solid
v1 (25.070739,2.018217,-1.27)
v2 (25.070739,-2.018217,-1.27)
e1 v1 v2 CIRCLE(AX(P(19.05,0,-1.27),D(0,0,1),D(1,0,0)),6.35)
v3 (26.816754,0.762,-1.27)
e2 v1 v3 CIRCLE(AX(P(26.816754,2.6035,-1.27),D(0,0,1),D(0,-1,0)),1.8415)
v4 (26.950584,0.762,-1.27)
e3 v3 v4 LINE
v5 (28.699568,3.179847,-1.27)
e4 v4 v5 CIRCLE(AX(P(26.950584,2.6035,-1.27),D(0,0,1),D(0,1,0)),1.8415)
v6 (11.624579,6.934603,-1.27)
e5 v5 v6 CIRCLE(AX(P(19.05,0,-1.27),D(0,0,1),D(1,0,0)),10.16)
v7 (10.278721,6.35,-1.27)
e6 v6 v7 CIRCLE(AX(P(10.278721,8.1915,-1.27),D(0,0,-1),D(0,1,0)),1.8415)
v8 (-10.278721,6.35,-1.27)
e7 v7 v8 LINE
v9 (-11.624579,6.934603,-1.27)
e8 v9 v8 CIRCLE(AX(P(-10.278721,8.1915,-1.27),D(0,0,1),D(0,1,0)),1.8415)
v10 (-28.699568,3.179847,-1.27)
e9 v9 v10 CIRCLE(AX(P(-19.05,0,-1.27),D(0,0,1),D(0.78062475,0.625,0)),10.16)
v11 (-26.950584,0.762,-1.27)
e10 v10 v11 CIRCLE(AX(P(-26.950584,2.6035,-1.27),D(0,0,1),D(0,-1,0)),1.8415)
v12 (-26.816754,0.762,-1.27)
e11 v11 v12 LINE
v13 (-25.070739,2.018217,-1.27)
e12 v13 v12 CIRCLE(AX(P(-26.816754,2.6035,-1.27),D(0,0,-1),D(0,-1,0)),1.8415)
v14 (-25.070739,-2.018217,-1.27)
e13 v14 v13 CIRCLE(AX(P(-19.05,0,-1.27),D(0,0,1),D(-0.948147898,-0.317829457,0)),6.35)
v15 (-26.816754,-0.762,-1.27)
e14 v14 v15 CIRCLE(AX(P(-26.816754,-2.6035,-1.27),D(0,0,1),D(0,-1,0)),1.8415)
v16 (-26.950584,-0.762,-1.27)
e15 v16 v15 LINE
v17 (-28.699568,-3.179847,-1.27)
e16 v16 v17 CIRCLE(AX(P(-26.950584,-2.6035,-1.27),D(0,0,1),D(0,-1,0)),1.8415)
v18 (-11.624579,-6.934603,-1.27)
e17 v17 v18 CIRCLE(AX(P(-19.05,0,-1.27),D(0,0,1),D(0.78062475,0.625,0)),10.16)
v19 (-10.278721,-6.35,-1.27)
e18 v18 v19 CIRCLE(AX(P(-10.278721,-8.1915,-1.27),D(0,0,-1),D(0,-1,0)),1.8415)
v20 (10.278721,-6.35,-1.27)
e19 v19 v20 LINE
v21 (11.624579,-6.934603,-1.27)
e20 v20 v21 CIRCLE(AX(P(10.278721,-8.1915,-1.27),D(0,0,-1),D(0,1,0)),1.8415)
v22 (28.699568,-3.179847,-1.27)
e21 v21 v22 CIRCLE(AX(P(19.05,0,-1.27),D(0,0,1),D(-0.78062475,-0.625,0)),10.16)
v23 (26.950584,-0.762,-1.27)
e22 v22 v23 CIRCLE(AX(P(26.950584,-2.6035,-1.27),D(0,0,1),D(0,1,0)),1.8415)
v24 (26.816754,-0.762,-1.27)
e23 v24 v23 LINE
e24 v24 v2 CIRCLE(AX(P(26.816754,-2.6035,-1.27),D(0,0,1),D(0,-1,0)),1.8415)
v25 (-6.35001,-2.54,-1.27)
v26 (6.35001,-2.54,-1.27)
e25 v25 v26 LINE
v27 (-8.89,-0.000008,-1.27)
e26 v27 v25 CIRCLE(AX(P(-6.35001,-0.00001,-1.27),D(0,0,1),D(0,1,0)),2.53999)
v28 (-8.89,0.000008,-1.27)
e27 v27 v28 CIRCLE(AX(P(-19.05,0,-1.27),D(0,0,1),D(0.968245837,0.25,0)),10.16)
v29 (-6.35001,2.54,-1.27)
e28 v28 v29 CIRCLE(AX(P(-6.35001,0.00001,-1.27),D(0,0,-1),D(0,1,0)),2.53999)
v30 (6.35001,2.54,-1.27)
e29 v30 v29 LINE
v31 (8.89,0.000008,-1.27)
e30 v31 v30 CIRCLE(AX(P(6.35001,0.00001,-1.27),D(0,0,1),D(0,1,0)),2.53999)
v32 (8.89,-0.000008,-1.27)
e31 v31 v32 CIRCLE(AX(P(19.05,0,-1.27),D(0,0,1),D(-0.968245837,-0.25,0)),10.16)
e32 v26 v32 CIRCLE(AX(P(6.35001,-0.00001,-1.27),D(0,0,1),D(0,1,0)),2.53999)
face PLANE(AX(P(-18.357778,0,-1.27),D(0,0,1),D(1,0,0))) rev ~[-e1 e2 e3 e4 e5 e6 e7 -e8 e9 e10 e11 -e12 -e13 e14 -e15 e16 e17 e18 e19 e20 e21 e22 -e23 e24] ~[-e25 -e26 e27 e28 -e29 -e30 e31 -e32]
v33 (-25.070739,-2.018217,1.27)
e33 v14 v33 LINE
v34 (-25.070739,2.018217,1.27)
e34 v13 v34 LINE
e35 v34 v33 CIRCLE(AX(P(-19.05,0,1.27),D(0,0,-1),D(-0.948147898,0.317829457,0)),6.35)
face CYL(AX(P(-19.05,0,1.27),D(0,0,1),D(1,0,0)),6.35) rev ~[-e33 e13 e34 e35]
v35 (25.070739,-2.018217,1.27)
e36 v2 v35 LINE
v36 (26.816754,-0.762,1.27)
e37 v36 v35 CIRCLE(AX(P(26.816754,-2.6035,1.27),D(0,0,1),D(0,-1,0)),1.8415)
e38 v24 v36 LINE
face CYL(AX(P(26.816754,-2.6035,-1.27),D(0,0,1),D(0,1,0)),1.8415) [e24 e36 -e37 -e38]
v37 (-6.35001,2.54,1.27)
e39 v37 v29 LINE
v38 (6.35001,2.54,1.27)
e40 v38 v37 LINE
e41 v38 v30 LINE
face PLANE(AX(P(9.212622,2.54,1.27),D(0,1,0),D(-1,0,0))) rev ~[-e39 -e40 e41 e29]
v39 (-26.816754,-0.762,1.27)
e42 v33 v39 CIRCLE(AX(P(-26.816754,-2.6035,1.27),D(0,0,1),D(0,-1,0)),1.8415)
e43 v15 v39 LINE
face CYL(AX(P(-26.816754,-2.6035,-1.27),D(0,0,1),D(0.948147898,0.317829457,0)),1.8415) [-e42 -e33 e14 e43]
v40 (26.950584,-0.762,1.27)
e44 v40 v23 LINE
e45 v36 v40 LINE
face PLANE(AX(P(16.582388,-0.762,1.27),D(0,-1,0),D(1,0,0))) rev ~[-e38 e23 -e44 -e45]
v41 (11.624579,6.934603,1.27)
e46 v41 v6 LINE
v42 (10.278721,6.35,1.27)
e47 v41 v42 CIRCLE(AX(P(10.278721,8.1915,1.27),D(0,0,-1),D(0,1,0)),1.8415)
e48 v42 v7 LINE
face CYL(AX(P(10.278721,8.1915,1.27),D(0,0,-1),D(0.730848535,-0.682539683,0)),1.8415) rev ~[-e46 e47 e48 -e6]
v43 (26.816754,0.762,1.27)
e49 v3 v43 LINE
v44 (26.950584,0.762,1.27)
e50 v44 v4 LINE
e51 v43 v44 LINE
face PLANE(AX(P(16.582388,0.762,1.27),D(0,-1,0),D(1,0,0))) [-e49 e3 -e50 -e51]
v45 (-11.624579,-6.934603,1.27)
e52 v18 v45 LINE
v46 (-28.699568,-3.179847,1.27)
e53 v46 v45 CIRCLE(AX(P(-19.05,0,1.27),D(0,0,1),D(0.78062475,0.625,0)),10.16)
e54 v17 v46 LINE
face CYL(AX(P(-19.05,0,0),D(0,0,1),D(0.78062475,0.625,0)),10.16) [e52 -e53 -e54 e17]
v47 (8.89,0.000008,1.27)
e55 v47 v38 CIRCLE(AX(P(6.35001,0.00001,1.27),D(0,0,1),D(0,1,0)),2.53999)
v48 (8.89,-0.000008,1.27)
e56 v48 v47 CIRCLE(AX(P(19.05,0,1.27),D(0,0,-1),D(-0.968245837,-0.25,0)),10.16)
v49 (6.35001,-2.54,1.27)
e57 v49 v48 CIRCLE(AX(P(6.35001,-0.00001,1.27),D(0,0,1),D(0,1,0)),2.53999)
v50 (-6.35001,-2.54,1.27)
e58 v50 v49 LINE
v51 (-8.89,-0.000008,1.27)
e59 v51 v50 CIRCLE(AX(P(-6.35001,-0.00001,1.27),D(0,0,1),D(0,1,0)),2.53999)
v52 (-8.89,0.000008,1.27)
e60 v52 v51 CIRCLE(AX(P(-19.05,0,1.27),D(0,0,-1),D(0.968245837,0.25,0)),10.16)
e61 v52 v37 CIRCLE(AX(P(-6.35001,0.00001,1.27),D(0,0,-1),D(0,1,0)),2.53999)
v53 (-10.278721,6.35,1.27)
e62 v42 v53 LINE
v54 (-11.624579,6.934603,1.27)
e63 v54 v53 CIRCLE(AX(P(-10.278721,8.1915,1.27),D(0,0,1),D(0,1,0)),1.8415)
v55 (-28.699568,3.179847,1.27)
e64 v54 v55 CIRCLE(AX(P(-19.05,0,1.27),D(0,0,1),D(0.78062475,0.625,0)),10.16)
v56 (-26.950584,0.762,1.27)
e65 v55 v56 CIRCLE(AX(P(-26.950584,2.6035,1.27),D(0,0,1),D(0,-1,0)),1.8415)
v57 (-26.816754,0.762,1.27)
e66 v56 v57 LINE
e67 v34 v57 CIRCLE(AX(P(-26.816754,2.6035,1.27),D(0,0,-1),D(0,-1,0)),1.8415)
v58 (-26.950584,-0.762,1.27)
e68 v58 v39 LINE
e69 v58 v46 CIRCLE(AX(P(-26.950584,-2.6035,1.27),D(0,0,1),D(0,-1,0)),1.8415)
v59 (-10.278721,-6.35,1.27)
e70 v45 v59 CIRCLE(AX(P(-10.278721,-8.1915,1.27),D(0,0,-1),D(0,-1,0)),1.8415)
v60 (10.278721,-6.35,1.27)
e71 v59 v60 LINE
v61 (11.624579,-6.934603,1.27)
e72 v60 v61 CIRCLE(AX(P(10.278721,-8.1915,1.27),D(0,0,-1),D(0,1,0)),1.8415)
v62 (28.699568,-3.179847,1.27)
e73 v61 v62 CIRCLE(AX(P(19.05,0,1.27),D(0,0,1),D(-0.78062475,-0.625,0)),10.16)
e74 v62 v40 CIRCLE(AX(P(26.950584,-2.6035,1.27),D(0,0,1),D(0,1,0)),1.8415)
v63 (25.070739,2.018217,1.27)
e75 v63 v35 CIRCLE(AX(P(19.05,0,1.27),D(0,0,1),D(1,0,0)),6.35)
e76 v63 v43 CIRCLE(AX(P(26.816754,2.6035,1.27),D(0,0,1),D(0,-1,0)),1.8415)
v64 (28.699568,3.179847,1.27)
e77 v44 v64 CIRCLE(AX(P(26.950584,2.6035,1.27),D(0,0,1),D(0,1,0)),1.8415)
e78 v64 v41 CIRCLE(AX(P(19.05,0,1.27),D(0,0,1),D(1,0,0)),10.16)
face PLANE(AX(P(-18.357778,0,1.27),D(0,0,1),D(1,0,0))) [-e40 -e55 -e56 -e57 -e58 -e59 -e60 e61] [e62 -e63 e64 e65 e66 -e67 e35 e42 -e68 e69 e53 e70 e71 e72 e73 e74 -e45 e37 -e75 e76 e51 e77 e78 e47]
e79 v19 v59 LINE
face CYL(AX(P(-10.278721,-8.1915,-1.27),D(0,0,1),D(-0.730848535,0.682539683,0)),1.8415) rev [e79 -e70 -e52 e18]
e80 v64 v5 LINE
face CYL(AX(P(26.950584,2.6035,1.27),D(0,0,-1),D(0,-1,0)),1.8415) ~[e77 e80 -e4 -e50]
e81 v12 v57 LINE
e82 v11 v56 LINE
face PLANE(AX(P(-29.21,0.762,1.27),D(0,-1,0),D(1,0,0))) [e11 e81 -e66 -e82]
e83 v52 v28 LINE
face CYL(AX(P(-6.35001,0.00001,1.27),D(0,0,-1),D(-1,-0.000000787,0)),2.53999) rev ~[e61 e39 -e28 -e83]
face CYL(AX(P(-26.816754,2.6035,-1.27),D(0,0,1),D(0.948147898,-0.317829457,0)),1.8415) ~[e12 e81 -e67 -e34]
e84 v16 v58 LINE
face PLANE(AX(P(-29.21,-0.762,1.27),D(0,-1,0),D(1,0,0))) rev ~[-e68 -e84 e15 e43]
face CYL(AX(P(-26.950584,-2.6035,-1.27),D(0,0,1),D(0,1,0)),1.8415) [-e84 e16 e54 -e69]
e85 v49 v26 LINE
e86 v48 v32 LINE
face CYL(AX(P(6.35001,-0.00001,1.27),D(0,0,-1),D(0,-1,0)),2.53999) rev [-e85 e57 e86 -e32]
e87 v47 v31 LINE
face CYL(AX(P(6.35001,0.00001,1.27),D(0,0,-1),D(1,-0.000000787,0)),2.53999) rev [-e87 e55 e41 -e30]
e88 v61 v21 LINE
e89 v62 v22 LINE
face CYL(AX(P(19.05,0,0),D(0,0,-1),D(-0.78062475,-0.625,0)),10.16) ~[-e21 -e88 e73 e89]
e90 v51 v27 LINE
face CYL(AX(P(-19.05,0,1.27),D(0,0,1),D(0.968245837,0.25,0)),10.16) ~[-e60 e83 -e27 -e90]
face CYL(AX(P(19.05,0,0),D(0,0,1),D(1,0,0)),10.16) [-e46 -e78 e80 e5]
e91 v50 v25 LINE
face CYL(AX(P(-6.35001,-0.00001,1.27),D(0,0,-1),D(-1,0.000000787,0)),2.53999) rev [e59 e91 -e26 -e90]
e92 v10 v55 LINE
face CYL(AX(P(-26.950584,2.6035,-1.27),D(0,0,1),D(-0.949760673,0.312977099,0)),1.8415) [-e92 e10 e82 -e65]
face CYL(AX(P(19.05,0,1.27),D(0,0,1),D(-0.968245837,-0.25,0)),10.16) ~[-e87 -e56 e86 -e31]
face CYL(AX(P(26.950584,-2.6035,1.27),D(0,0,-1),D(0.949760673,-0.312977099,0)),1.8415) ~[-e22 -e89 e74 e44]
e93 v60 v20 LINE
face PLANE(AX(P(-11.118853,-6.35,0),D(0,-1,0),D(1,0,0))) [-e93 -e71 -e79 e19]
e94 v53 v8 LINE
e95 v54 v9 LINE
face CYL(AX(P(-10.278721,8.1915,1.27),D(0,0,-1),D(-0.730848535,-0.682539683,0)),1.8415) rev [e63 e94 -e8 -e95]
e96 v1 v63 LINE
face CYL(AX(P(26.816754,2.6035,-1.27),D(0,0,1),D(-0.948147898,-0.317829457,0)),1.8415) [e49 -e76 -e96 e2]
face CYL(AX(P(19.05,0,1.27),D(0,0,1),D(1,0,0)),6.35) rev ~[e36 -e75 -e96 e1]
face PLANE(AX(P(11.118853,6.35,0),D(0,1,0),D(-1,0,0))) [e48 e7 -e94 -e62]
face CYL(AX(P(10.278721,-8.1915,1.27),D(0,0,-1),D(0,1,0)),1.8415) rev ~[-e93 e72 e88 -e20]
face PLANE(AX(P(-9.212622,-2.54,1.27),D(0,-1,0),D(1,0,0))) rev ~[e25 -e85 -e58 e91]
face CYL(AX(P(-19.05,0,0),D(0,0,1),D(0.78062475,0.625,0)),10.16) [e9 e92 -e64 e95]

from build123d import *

# Parameters (mm, degrees)
F1_DEPTH = 1.27
F2_R     = 6.35
F3_DEPTH = 25.4
F4_W     = 12.6276115155
F4_H     = 1.524
F5_DEPTH = 25.4
F6_R     = 1.8415
F8_DEPTH = 25.4
F9_R     = 2.53999


# Not quite as in the source:
# - a fillet or chamfer is up to 0.001 mm smaller than in the source, because OpenCascade refuses the exact size


with BuildPart() as f1:
    # F0 (on Top) → F1 (new body, symmetric)
    with BuildSketch(Plane.XY):
        with BuildLine():
            ThreePointArc((-11.118852542, -6.35), (-9.4633932444, -3.3649028089), (-8.89, 0))
            ThreePointArc((-8.89, 0), (-9.4633932444, 3.3649028089), (-11.118852542, 6.35))
            ThreePointArc((-11.118852542, 6.35), (-29.21, 0), (-11.118852542, -6.35))
        make_face()
        with BuildLine():
            ThreePointArc((-11.118852542, 6.35), (-9.4633932444, 3.3649028089), (-8.89, 0))
            ThreePointArc((-8.89, 0), (-9.4633932444, -3.3649028089), (-11.118852542, -6.35))
            Line((-11.118852542, -6.35), (11.118852542, -6.35))
            ThreePointArc((11.118852542, -6.35), (8.89, 0), (11.118852542, 6.35))
            Line((11.118852542, 6.35), (-11.118852542, 6.35))
        make_face()
        with BuildLine():
            ThreePointArc((29.21, 0), (22.4149028089, 9.5866067556), (11.118852542, 6.35))
            ThreePointArc((11.118852542, 6.35), (8.89, 0), (11.118852542, -6.35))
            ThreePointArc((11.118852542, -6.35), (22.4149028089, -9.5866067556), (29.21, 0))
        make_face()
    extrude(amount=F1_DEPTH, both=True)

    # F2 (on face) → F3 (cut)
    with BuildSketch(Plane.XY.offset(1.27)):
        with Locations((-19.05, 0)):
            Circle(F2_R)
        with Locations((19.05, 0)):
            Circle(F2_R)
    extrude(amount=-F3_DEPTH, mode=Mode.SUBTRACT)

    # F4 (on face) → F5 (cut)
    with BuildSketch(Plane.XY.offset(1.27)):
        with Locations((-22.8961942422, 0)):
            Rectangle(F4_W, F4_H)
        with Locations((22.8961942422, 0)):
            Rectangle(F4_W, F4_H)
    extrude(amount=-F5_DEPTH, mode=Mode.SUBTRACT)

    # F6
    f6_edges = [f1.edges().sort_by_distance(p)[0] for p in [
        (-29.181385, 0.762, 0),
        (-25.354114, 0.762, 0),
        (-25.354114, -0.762, 0),
        (-29.181385, -0.762, 0),
        (25.354114, -0.762, 0),
        (25.354114, 0.762, 0),
        (29.181385, 0.762, 0),
        (29.181385, -0.762, 0),
        (-11.118853, -6.35, 0),
        (11.118853, -6.35, 0),
        (11.118853, 6.35, 0),
        (-11.118853, 6.35, 0),
    ]]
    fillet(f6_edges, radius=F6_R)

    # F7 (on face) → F8 (cut)
    with BuildSketch(Plane.XY.offset(1.27)):
        with BuildLine():
            ThreePointArc((-9.2126223006, 2.54), (-8.89, 0), (-9.2126223006, -2.54))
            Line((-9.2126223006, -2.54), (9.2126223006, -2.54))
            ThreePointArc((9.2126223006, -2.54), (8.89, 0), (9.2126223006, 2.54))
            Line((9.2126223006, 2.54), (-9.2126223006, 2.54))
        make_face()
    extrude(amount=-F8_DEPTH, mode=Mode.SUBTRACT)

    # F9 (radius 2.54 in the source; OpenCascade refuses exactly that, so slightly less here)
    f9_edges = [f1.edges().sort_by_distance(p)[0] for p in [
        (-9.212622, -2.54, 0),
        (-9.212622, 2.54, 0),
        (9.212622, 2.54, 0),
        (9.212622, -2.54, 0),
    ]]
    fillet(f9_edges, radius=F9_R)


solid = f1.part
